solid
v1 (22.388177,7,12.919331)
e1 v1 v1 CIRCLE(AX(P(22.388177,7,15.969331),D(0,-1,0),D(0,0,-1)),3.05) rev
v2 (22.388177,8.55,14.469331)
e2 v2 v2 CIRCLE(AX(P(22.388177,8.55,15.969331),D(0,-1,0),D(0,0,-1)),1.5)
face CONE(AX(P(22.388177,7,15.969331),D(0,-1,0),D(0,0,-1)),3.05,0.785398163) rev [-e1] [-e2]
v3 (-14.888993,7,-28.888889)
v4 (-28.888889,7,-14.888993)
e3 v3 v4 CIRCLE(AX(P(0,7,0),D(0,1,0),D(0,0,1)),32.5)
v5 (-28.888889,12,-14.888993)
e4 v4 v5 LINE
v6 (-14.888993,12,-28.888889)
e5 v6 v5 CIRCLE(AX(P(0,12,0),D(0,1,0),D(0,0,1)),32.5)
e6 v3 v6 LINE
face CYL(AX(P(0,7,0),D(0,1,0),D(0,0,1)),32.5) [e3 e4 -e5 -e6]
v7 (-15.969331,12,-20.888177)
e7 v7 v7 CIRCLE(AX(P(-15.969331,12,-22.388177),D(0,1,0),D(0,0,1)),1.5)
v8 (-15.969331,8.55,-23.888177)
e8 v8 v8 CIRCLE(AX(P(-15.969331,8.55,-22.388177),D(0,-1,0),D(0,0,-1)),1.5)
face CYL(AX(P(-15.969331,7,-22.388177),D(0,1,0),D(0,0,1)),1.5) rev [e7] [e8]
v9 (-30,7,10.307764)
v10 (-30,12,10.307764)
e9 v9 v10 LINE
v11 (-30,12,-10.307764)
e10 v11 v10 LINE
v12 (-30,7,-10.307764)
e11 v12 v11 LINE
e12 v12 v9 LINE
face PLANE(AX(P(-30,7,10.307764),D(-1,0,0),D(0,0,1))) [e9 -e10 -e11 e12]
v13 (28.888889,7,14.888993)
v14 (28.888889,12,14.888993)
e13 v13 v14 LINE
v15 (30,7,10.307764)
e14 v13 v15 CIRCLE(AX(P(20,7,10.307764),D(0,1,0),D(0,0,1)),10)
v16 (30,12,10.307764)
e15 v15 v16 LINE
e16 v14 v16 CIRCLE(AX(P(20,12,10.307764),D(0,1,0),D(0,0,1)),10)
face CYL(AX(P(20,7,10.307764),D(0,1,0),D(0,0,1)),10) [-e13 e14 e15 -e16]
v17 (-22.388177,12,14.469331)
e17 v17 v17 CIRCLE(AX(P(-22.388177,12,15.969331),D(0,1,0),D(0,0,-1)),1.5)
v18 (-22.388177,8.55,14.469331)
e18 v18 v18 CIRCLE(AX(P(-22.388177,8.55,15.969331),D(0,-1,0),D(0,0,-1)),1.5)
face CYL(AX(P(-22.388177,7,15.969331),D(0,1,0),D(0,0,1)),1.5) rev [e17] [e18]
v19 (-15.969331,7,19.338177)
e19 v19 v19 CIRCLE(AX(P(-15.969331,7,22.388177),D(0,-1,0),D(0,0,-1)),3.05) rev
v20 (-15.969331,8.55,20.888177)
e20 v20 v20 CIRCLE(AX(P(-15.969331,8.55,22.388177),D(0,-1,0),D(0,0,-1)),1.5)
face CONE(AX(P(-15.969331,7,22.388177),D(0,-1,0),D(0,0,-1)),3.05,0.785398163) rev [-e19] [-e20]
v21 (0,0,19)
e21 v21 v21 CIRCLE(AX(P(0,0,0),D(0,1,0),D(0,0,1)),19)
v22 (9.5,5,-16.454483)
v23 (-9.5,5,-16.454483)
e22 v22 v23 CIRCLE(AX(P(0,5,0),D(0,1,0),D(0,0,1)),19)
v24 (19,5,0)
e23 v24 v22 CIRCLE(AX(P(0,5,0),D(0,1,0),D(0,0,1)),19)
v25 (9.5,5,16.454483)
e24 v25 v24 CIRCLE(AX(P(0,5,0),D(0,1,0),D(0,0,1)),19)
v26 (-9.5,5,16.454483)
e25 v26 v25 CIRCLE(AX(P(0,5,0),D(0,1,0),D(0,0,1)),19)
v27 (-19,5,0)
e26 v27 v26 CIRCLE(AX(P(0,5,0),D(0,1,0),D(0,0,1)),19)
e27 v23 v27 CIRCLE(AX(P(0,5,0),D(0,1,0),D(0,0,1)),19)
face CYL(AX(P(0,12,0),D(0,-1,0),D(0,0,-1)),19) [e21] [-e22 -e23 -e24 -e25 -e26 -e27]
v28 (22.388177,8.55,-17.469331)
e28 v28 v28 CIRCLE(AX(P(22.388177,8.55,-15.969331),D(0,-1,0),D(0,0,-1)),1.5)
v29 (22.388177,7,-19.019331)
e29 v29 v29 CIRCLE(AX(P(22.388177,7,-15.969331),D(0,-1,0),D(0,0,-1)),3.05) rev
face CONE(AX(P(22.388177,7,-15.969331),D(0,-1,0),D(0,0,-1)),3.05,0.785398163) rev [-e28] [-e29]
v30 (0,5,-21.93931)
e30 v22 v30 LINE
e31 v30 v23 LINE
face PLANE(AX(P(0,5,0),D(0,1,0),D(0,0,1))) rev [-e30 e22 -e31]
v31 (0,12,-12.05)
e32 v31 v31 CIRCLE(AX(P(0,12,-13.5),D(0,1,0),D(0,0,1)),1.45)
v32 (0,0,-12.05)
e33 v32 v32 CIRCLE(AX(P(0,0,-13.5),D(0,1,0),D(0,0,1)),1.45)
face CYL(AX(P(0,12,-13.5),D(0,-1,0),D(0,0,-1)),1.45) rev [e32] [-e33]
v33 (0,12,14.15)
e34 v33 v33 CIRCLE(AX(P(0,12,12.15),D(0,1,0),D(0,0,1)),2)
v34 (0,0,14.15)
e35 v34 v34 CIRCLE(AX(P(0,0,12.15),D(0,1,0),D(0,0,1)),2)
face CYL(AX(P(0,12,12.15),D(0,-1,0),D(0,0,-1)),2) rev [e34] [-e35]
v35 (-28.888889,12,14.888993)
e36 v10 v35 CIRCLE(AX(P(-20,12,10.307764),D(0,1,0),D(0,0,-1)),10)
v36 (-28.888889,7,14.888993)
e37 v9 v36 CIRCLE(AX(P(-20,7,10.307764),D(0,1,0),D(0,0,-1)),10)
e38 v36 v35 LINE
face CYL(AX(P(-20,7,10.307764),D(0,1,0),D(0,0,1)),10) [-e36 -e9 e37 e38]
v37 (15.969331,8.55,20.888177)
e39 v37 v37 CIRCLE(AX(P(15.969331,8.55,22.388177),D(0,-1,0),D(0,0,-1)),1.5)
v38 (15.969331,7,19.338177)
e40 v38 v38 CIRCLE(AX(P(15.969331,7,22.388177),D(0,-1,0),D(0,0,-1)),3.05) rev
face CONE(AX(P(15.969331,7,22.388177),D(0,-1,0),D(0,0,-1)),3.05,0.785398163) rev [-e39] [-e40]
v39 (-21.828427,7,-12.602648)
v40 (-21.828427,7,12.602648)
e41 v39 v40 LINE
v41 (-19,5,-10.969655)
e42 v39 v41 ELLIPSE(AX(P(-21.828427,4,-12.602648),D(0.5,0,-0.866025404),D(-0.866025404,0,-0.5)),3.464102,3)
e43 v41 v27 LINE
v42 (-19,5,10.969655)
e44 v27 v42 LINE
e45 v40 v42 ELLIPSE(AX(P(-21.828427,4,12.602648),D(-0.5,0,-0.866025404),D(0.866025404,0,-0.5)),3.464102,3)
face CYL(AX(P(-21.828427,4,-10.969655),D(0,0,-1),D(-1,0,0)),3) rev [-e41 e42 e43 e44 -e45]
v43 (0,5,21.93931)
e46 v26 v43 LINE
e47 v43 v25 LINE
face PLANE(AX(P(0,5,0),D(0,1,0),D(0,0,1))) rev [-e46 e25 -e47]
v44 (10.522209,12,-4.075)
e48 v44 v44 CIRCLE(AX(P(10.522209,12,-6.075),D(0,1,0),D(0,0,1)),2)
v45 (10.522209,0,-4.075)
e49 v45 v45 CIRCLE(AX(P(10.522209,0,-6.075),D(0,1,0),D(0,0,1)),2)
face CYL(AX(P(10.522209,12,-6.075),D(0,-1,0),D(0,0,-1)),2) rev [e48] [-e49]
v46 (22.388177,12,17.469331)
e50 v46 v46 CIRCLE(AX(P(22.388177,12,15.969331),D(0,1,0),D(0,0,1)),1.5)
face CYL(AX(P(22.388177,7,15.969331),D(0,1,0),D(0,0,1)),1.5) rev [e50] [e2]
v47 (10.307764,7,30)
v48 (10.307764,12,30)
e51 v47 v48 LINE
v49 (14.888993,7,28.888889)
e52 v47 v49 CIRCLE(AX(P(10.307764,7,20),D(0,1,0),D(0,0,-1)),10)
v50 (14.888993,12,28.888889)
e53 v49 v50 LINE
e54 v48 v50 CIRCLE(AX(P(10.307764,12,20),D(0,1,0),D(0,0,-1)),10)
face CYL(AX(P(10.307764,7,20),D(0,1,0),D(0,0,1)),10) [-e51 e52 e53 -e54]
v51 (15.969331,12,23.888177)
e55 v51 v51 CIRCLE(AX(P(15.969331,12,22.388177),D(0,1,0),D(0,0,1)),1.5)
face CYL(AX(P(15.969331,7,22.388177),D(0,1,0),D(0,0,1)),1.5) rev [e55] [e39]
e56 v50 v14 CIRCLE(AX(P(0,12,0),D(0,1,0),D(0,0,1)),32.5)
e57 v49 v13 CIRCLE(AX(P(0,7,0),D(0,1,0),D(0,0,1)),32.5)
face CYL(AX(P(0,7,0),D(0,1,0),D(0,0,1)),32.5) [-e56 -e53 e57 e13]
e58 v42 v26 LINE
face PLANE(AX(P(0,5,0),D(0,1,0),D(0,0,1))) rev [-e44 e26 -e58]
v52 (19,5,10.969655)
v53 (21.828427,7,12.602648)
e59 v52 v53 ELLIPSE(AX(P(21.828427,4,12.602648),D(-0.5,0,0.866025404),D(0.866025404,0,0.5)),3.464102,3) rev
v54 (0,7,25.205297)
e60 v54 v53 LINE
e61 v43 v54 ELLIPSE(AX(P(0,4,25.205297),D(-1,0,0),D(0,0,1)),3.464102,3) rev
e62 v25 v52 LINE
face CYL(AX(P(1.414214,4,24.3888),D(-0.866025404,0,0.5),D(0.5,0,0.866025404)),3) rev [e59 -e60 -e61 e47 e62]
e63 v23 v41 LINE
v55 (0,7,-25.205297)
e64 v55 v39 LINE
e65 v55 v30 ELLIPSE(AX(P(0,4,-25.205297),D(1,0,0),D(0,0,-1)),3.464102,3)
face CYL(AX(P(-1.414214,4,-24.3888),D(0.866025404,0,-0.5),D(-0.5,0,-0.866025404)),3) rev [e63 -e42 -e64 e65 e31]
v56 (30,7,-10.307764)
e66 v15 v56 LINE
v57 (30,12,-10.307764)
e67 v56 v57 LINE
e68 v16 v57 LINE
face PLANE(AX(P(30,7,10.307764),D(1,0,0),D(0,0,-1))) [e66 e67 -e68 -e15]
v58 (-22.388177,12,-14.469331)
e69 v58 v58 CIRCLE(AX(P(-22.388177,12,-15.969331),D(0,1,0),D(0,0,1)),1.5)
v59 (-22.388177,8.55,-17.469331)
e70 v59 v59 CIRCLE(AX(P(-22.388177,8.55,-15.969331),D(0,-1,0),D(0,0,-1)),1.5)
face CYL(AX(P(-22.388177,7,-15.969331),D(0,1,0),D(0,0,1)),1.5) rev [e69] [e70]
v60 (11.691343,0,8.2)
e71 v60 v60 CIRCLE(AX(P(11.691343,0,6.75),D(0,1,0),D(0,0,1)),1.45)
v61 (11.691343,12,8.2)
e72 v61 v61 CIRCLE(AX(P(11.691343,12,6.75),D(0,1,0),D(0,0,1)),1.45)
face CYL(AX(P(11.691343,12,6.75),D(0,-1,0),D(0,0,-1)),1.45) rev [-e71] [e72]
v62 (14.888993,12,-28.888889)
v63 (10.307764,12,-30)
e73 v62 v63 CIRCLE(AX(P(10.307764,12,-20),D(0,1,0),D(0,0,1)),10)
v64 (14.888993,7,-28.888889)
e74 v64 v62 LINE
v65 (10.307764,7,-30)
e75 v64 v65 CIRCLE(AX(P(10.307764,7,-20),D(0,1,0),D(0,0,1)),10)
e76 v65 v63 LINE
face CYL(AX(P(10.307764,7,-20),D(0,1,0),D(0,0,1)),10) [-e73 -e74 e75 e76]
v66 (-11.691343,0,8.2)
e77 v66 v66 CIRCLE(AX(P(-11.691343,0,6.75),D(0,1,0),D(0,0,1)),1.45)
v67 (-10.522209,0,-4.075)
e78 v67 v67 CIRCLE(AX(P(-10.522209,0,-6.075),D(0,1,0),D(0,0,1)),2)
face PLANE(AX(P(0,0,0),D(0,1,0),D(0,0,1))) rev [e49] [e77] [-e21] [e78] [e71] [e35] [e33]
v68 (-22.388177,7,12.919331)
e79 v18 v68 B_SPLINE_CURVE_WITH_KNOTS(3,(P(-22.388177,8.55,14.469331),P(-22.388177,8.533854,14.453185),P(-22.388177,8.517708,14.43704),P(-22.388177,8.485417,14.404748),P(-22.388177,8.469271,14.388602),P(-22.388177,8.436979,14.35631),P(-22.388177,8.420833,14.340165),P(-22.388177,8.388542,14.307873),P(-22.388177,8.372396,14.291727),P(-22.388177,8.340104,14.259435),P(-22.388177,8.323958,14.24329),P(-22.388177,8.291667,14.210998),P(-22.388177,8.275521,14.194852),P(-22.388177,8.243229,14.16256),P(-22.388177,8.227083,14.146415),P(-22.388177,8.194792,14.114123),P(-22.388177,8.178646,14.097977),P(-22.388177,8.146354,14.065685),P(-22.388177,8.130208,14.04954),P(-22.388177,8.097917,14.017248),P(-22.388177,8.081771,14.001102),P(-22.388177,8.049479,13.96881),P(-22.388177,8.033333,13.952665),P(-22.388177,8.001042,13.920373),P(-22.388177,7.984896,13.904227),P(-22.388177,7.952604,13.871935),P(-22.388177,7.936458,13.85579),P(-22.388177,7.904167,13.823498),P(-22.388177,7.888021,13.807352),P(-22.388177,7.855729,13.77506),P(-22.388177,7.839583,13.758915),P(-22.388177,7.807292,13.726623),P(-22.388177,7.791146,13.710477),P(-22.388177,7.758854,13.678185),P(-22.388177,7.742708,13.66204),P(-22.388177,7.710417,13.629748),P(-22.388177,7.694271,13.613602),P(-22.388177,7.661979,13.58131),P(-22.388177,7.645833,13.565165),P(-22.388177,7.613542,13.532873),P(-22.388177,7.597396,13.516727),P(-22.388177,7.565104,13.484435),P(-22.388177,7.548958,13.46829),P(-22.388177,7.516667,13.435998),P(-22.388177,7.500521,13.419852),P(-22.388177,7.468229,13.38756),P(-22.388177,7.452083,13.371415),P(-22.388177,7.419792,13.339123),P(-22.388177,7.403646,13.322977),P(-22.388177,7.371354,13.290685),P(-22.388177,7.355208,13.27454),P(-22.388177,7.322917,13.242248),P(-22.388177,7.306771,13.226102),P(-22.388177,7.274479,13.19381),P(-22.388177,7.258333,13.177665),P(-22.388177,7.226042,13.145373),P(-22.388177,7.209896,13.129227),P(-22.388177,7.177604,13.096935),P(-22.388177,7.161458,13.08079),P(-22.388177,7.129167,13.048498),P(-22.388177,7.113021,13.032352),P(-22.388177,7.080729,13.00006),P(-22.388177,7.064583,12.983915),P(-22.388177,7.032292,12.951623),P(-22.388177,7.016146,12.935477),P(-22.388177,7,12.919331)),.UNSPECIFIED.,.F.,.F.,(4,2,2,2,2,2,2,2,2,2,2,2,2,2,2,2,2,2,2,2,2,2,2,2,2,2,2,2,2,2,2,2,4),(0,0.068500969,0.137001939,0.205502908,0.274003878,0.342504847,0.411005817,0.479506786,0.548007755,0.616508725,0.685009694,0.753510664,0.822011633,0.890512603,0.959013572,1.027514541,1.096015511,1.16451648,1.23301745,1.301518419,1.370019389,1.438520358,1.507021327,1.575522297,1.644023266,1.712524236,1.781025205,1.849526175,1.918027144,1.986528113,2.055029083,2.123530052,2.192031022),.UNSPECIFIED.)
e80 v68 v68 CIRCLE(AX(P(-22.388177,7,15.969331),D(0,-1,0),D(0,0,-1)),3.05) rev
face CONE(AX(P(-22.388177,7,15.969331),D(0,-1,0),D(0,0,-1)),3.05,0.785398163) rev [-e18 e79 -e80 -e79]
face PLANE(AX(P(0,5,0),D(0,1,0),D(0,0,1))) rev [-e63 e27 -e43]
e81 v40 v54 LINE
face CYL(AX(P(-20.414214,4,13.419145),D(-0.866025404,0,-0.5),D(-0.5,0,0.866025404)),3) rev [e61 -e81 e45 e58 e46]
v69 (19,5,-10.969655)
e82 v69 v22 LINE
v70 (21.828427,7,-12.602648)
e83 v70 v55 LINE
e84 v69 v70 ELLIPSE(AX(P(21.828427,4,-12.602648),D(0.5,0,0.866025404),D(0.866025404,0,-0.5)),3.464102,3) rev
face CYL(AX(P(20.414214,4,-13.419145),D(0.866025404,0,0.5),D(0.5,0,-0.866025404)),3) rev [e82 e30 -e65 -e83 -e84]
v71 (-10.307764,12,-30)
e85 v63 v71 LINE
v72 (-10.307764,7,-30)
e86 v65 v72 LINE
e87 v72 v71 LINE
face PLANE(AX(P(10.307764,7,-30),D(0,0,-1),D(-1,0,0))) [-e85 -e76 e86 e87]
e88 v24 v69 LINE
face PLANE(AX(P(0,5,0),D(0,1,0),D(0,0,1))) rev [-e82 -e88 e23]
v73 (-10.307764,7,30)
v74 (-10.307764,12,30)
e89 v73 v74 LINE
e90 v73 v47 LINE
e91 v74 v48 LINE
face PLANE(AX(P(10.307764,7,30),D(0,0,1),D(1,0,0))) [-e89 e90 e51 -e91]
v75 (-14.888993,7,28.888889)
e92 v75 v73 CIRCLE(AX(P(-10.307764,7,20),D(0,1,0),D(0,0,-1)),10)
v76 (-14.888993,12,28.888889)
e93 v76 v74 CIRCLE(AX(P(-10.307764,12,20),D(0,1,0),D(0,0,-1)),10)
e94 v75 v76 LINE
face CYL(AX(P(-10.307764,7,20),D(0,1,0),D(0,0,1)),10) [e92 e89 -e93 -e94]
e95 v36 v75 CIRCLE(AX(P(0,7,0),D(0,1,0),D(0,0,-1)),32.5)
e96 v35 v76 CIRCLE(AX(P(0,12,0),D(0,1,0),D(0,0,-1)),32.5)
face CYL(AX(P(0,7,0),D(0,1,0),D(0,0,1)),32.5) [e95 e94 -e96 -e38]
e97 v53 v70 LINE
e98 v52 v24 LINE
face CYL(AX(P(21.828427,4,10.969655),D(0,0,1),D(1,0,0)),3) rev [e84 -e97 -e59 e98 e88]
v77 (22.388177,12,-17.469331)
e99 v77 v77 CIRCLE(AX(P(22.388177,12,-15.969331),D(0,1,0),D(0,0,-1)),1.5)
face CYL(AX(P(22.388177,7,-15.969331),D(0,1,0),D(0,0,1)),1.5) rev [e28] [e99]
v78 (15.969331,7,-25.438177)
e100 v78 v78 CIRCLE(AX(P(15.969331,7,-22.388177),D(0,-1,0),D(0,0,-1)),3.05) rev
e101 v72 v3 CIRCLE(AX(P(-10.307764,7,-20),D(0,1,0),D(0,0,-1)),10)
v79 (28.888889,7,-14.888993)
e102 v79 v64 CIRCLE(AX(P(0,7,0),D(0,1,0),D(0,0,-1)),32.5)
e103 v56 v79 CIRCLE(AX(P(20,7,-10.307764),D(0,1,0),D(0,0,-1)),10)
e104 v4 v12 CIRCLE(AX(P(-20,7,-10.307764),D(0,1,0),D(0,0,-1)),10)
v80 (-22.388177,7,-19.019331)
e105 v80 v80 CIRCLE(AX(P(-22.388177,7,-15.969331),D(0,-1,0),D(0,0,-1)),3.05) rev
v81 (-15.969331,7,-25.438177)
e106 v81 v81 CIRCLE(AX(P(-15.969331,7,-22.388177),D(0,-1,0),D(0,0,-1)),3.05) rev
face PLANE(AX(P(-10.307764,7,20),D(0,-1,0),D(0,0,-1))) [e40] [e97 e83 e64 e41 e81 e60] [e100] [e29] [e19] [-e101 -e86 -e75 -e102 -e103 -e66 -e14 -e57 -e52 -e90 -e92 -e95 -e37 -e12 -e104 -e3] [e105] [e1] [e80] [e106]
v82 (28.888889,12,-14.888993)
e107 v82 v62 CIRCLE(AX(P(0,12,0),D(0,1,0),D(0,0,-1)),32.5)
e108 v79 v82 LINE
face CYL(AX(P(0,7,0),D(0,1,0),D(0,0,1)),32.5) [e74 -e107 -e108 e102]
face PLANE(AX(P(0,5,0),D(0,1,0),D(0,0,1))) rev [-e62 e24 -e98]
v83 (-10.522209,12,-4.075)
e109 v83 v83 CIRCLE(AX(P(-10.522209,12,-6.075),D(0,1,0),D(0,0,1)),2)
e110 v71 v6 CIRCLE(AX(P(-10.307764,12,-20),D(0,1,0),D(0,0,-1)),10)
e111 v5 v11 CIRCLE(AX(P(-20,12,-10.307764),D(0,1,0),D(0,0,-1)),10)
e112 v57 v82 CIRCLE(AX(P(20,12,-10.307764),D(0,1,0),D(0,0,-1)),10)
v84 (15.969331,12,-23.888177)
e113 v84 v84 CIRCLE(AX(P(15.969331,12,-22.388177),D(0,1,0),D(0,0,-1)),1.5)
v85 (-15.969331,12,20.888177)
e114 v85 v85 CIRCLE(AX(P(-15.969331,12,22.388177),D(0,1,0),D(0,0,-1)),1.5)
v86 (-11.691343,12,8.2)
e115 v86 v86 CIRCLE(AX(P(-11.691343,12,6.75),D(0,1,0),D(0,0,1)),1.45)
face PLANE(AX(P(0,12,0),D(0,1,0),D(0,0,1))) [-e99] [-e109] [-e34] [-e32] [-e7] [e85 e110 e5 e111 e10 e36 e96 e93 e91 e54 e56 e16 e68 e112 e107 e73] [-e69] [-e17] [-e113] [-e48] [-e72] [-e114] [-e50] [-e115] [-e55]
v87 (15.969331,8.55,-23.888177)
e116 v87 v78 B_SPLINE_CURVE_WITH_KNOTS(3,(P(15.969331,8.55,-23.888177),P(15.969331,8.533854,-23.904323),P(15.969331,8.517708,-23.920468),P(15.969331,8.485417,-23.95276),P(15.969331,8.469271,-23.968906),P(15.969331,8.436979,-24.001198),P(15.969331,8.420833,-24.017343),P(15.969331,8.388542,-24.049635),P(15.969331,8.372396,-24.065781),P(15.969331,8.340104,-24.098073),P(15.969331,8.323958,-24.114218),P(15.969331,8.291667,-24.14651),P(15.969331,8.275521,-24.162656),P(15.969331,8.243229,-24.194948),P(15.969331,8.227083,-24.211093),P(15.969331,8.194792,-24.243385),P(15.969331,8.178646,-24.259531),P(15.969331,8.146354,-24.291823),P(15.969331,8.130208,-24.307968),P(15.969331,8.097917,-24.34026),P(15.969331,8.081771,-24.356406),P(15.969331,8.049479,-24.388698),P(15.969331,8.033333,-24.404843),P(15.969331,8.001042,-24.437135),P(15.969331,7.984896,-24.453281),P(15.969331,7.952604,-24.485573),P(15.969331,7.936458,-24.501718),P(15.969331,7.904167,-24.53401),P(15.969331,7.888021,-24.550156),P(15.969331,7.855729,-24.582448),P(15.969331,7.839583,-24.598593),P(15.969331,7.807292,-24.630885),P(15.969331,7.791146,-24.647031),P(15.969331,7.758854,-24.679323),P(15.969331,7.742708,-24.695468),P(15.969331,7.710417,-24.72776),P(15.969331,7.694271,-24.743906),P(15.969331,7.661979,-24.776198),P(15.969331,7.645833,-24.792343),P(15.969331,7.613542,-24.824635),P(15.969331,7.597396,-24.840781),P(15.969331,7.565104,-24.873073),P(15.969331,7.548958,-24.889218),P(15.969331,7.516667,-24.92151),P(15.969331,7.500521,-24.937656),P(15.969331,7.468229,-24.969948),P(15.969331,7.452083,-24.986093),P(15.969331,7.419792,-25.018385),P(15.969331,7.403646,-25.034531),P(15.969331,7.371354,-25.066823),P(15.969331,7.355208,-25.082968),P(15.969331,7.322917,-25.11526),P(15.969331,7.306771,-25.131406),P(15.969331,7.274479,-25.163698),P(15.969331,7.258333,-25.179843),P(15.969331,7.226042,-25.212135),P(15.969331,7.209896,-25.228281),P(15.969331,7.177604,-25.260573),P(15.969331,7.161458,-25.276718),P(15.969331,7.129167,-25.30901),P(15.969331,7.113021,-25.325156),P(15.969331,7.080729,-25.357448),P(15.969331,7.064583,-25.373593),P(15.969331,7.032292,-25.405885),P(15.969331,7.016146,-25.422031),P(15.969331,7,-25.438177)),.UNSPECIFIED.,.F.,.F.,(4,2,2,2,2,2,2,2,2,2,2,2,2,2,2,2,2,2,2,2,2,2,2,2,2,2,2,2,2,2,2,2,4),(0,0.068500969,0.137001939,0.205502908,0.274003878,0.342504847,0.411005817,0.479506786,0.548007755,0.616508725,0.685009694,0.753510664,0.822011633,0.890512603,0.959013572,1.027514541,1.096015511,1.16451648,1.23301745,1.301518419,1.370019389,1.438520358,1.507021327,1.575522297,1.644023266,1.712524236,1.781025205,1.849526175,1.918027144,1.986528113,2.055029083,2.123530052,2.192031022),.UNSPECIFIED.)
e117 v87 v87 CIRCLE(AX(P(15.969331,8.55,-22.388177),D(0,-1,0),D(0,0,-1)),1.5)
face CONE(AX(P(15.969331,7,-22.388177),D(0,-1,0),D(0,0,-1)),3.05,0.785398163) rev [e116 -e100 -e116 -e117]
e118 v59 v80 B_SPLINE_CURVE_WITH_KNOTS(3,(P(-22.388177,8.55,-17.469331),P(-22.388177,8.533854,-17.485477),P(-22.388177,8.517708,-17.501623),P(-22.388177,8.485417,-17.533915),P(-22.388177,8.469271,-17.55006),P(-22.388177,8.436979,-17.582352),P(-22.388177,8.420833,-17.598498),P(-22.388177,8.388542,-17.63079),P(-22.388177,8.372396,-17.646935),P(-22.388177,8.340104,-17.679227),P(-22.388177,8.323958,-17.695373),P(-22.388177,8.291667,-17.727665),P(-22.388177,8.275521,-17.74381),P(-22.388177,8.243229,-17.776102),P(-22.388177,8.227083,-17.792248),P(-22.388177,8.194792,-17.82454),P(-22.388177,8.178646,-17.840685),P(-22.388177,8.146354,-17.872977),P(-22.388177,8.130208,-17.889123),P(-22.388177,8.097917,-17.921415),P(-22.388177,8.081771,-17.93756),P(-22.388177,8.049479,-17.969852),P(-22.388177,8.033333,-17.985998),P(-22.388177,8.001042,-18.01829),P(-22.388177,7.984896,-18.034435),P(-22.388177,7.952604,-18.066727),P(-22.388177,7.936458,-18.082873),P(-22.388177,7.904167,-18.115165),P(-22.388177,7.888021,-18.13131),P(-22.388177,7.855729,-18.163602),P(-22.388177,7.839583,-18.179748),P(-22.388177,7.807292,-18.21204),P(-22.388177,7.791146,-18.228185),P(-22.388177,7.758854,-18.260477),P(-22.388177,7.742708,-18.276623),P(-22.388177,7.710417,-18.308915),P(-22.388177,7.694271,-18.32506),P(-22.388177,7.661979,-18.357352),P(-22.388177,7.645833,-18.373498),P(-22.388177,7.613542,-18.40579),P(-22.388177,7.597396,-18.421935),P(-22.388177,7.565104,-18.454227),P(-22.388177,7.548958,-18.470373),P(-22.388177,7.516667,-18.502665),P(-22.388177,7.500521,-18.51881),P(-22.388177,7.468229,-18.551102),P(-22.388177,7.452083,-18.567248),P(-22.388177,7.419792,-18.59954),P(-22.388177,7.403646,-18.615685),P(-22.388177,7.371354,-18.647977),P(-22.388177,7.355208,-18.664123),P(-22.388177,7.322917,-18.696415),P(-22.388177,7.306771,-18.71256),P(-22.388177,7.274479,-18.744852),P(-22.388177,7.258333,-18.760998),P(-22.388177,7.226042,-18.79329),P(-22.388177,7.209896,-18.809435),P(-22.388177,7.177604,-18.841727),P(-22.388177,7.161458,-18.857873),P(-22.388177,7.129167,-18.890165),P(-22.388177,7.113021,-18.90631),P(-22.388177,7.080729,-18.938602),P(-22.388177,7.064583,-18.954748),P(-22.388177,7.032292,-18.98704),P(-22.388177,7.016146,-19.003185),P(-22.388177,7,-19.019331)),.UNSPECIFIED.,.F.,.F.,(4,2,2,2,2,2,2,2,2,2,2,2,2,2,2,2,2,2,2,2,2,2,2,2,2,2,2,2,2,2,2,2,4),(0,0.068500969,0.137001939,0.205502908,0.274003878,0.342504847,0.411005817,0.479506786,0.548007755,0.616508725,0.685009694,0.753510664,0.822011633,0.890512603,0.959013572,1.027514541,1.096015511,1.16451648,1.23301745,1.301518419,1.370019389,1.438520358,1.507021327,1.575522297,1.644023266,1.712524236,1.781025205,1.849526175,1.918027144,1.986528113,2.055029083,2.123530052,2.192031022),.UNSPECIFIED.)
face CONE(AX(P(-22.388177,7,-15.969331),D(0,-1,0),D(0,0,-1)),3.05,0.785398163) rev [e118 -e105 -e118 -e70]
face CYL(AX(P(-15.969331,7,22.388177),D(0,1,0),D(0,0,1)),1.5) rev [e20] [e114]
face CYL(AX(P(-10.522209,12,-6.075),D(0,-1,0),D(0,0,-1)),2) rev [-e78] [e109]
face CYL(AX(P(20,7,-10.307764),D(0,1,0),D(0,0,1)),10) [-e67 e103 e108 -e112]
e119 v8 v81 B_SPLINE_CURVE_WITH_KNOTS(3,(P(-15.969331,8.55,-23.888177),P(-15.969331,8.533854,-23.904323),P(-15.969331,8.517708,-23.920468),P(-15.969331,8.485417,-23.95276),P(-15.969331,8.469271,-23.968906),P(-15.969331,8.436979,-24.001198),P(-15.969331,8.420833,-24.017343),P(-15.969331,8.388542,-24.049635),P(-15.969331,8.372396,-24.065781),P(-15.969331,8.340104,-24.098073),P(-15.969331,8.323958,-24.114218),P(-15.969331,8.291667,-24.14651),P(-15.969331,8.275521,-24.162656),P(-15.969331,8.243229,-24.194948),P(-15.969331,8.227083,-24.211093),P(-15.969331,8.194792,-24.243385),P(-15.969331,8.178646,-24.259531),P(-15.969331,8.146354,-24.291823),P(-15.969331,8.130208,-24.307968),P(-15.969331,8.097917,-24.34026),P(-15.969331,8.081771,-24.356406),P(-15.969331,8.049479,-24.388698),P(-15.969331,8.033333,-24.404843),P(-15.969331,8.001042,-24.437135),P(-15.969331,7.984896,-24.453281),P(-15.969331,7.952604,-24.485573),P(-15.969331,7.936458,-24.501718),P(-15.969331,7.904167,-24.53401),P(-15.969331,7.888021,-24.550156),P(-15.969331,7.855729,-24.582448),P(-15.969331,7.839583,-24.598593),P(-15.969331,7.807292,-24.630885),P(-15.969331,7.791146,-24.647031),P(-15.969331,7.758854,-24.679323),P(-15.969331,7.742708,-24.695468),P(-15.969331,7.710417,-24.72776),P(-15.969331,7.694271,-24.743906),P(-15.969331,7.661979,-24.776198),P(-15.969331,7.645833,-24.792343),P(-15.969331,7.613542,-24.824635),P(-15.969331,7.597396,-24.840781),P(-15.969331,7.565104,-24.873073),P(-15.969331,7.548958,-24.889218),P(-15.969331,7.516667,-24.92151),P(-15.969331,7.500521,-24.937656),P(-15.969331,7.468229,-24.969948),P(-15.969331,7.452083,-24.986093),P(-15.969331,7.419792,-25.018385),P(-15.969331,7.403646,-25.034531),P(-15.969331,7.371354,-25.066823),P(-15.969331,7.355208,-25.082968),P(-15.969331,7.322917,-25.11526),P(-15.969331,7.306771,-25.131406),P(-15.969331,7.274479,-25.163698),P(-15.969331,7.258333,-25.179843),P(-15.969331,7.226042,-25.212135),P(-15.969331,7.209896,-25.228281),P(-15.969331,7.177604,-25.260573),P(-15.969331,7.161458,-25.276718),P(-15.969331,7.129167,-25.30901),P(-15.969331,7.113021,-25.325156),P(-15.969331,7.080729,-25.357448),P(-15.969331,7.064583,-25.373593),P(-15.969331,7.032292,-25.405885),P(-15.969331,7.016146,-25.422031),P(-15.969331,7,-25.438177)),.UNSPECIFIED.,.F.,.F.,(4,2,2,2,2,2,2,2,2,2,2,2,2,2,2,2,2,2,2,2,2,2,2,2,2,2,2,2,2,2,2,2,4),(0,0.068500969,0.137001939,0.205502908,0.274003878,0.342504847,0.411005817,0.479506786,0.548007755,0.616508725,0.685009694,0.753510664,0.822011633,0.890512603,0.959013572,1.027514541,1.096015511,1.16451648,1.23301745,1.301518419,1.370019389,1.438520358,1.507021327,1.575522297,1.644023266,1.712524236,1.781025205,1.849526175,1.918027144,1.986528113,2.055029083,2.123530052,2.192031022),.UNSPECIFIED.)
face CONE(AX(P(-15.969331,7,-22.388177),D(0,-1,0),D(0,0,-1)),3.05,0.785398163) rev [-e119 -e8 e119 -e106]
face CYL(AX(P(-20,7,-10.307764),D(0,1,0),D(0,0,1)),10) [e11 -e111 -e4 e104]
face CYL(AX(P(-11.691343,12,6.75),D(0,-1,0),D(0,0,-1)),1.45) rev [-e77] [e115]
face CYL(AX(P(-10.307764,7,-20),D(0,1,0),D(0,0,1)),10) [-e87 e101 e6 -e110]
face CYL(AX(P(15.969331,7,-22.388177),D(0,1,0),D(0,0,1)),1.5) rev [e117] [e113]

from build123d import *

# Parameters (mm, degrees)
SKETCH_1_R          = 19
SKETCH_1_R_2        = 1.45
SKETCH_1_R_3        = 2
EXTRUDE_1_DEPTH     = 12
EXTRUDE_START       = -7
SKETCH_2_R          = 1.45
SKETCH_2_R_2        = 2
EXTRUDE_2_DEPTH     = 7
SKETCH_3_R          = 1.45
CUT_EXTRUDE_1_DEPTH = 8
SKETCH_4_R          = 1.45
CUT_EXTRUDE_2_DEPTH = 8
SKETCH_5_R          = 1.45
CUT_EXTRUDE_3_DEPTH = 8
CUT_EXTRUDE_START   = -8
SKETCH_6_R          = 1.45
CUT_EXTRUDE_4_DEPTH = 8
SKETCH_7_R          = 1.45
CUT_EXTRUDE_5_DEPTH = 8
EXTRUDE_START_2     = -5
SKETCH_8_R          = 1.5
SKETCH_8_R_2        = 2
EXTRUDE_3_DEPTH     = 5
FILLET_1_R          = 3
CHAMFER_1_SIZE      = 1.55


with BuildPart() as part:
    # 草图1 → 凸台-拉伸1 (new body)
    with BuildSketch(Plane(origin=(0, 0, 0), x_dir=(1, 0, 0), z_dir=(0, 1, 0))):
        with Locations(Location((0, 0, 0), (0, 0, 270))):
            Circle(SKETCH_1_R)
        with Locations(Location((0, 13.5, 0), (0, 0, 270))):
            Circle(SKETCH_1_R_2, mode=Mode.SUBTRACT)
        with Locations(Location((-11.691342951, -6.75, 0), (0, 0, 270))):
            Circle(SKETCH_1_R_2, mode=Mode.SUBTRACT)
        with Locations(Location((11.691342951, -6.75, 0), (0, 0, 270))):
            Circle(SKETCH_1_R_2, mode=Mode.SUBTRACT)
        with Locations(Location((-10.522208656, 6.075, 0), (0, 0, 270))):
            Circle(SKETCH_1_R_3, mode=Mode.SUBTRACT)
        with Locations(Location((0, -12.15, 0), (0, 0, 270))):
            Circle(SKETCH_1_R_3, mode=Mode.SUBTRACT)
        with Locations(Location((10.522208656, 6.075, 0), (0, 0, 270))):
            Circle(SKETCH_1_R_3, mode=Mode.SUBTRACT)
    extrude(amount=EXTRUDE_1_DEPTH)

    # 草图2 → 凸台-拉伸2 (add)
    with BuildSketch(Plane(origin=(0, 12, 0), x_dir=(1, 0, 0), z_dir=(0, 1, 0)).offset(EXTRUDE_START)):
        Polygon((0, 21.939310229), (-19, 10.969655115), (-19, -10.969655115), (0, -21.939310229), (19, -10.969655115), (19, 10.969655115), align=None)
        with Locations(Location((0, 13.5, 0), (0, 0, 270))):
            Circle(SKETCH_2_R, mode=Mode.SUBTRACT)
        with Locations(Location((-10.522208656, 6.075, 0), (0, 0, 270))):
            Circle(SKETCH_2_R_2, mode=Mode.SUBTRACT)
        with Locations(Location((10.522208656, 6.075, 0), (0, 0, 270))):
            Circle(SKETCH_2_R_2, mode=Mode.SUBTRACT)
        with Locations(Location((-11.691342951, -6.75, 0), (0, 0, 270))):
            Circle(SKETCH_2_R, mode=Mode.SUBTRACT)
        with Locations(Location((0, -12.15, 0), (0, 0, 270))):
            Circle(SKETCH_2_R_2, mode=Mode.SUBTRACT)
        with Locations(Location((11.691342951, -6.75, 0), (0, 0, 270))):
            Circle(SKETCH_2_R, mode=Mode.SUBTRACT)
    extrude(amount=EXTRUDE_2_DEPTH)

    # 草图3 → 切除-拉伸1 (cut)
    with BuildSketch(Plane(origin=(9.5, 0, 16.454482672), x_dir=(0.8660254037844384, 0, -0.5000000000000004), z_dir=(0.5000000000000004, 0, 0.8660254037844384))):
        with Locations((0, 8.5)):
            Circle(SKETCH_3_R)
    extrude(amount=-CUT_EXTRUDE_1_DEPTH, mode=Mode.SUBTRACT)

    # 草图4 → 切除-拉伸2 (cut)
    with BuildSketch(Plane(origin=(-9.5, 0, 16.454482672), x_dir=(0.8660254037844385, 0, 0.5000000000000004), z_dir=(-0.5000000000000003, 0, 0.8660254037844384))):
        with Locations((0, 8.5)):
            Circle(SKETCH_4_R)
    extrude(amount=-CUT_EXTRUDE_2_DEPTH, mode=Mode.SUBTRACT)

    # 草图5 → 切除-拉伸3 (cut)
    with BuildSketch(Plane.ZY.offset(19)):
        with Locations((0, 8.5)):
            Circle(SKETCH_5_R)
    extrude(amount=-CUT_EXTRUDE_3_DEPTH, mode=Mode.SUBTRACT)

    # 草图6 → 切除-拉伸4 (cut)
    with BuildSketch(Plane(origin=(19, 0, 0), x_dir=(0, 0, -1), z_dir=(1, 0, 0)).offset(CUT_EXTRUDE_START)):
        with Locations(Location((0, 8.5, 0), (0, 0, 180))):
            Circle(SKETCH_6_R)
    extrude(amount=CUT_EXTRUDE_4_DEPTH, mode=Mode.SUBTRACT)

    # 草图7 → 切除-拉伸5 (cut)
    with BuildSketch(Plane(origin=(9.5, 0, -16.454482672), x_dir=(-0.8660254037844387, 0, -0.49999999999999994), z_dir=(0.4999999999999999, 0, -0.8660254037844386)).offset(CUT_EXTRUDE_START)):
        with Locations(Location((0, 8.5, 0), (0, 0, 180))):
            Circle(SKETCH_7_R)
    extrude(amount=CUT_EXTRUDE_5_DEPTH, mode=Mode.SUBTRACT)

    # 草图8 → 凸台-拉伸3 (add)
    with BuildSketch(Plane(origin=(0, 12, 0), x_dir=(1, 0, 0), z_dir=(0, 1, 0)).offset(EXTRUDE_START_2)):
        with BuildLine():
            Line((10.307764064, 30), (-10.307764064, 30))
            ThreePointArc((-10.307764064, 30), (-12.664786668, 29.718253158), (-14.888992537, 28.888888889))
            ThreePointArc((-14.888992537, 28.888888889), (-22.980970389, 22.980970389), (-28.888888889, 14.888992537))
            ThreePointArc((-28.888888889, 14.888992537), (-29.718253158, 12.664786668), (-30, 10.307764064))
            Line((-30, 10.307764064), (-30, -10.307764064))
            ThreePointArc((-30, -10.307764064), (-29.718253158, -12.664786668), (-28.888888889, -14.888992537))
            ThreePointArc((-28.888888889, -14.888992537), (-22.980970389, -22.980970389), (-14.888992537, -28.888888889))
            ThreePointArc((-14.888992537, -28.888888889), (-12.664786668, -29.718253158), (-10.307764064, -30))
            Line((-10.307764064, -30), (10.307764064, -30))
            ThreePointArc((10.307764064, -30), (12.664786668, -29.718253158), (14.888992537, -28.888888889))
            ThreePointArc((14.888992537, -28.888888889), (22.980970389, -22.980970389), (28.888888889, -14.888992537))
            ThreePointArc((28.888888889, -14.888992537), (29.718253158, -12.664786668), (30, -10.307764064))
            Line((30, -10.307764064), (30, 10.307764064))
            ThreePointArc((30, 10.307764064), (29.718253158, 12.664786668), (28.888888889, 14.888992537))
            ThreePointArc((28.888888889, 14.888992537), (22.980970389, 22.980970389), (14.888992537, 28.888888889))
            ThreePointArc((14.888992537, 28.888888889), (12.664786668, 29.718253158), (10.307764064, 30))
        make_face()
        with Locations(Location((-22.388176755, 15.969331282, 0), (0, 0, 270))):
            Circle(SKETCH_8_R, mode=Mode.SUBTRACT)
        with Locations(Location((-15.969331282, 22.388176755, 0), (0, 0, 270))):
            Circle(SKETCH_8_R, mode=Mode.SUBTRACT)
        with Locations(Location((-22.388176755, -15.969331282, 0), (0, 0, 90))):
            Circle(SKETCH_8_R, mode=Mode.SUBTRACT)
        with Locations(Location((-15.969331282, -22.388176755, 0), (0, 0, 90))):
            Circle(SKETCH_8_R, mode=Mode.SUBTRACT)
        with Locations(Location((15.969331282, -22.388176755, 0), (0, 0, 270))):
            Circle(SKETCH_8_R, mode=Mode.SUBTRACT)
        with Locations(Location((22.388176755, -15.969331282, 0), (0, 0, 270))):
            Circle(SKETCH_8_R, mode=Mode.SUBTRACT)
        with Locations(Location((22.388176755, 15.969331282, 0), (0, 0, 90))):
            Circle(SKETCH_8_R, mode=Mode.SUBTRACT)
        with Locations(Location((15.969331282, 22.388176755, 0), (0, 0, 90))):
            Circle(SKETCH_8_R, mode=Mode.SUBTRACT)
        with Locations((0, 13.5)):
            Circle(SKETCH_8_R, mode=Mode.SUBTRACT)
        with Locations((11.691342951, -6.75)):
            Circle(SKETCH_8_R, mode=Mode.SUBTRACT)
        with Locations(Location((0, -12.15, 0), (0, 0, 270))):
            Circle(SKETCH_8_R_2, mode=Mode.SUBTRACT)
        with Locations(Location((10.522208656, 6.075, 0), (0, 0, 270))):
            Circle(SKETCH_8_R_2, mode=Mode.SUBTRACT)
        with Locations((-11.691342951, -6.75)):
            Circle(SKETCH_8_R, mode=Mode.SUBTRACT)
        with Locations(Location((-10.522208656, 6.075, 0), (0, 0, 270))):
            Circle(SKETCH_8_R_2, mode=Mode.SUBTRACT)
    extrude(amount=EXTRUDE_3_DEPTH)

    # 圆角1
    # the kernel refuses this fillet: 3 mm, written as the material it adds along each edge
    with BuildSketch(Plane(origin=(-25.123724357, 7, 7.434121209), x_dir=(0, -1, 0), z_dir=(0.8660254037844385, 0, 0.5000000000000003))) as fillet_1_piece_1_section:
        with BuildLine():
            CenterArc((3, -2.828427125), FILLET_1_R, 109.471220634, 70.528779366)
            Line((0, -2.828427125), (-0.06, -2.828427125))
            Line((-0.06, -2.828427125), (-0.06, 0))
            Line((-0.06, 0), (0, 0.06))
            ThreePointArc((0, 0.06), (1, 0.06), (1.98, 0.056568542))
            Line((1.98, 0.056568542), (2, 0))
        make_face()
    fillet_1_piece_1 = extrude(amount=36.081445853, mode=Mode.PRIVATE)
    fillet_1_piece_1 = split(fillet_1_piece_1, bisect_by=Plane(origin=(-5.242974287, 6.477045854, 24.966342845), z_dir=(-0.5000000000000004, 0, -0.8660254037844384)), keep=Keep.TOP, mode=Mode.PRIVATE)
    fillet_1_piece_1 = split(fillet_1_piece_1, bisect_by=Plane(origin=(-19, 6.477045854, 17.023720346), z_dir=(1, 0, 0)), keep=Keep.TOP, mode=Mode.PRIVATE)
    add(fillet_1_piece_1)
    with BuildSketch(Plane(origin=(-6.123724357, 7, 25.474844135), x_dir=(0, -1, 0), z_dir=(0.8660254037844384, 0, -0.5000000000000004))) as fillet_1_piece_2_section:
        with BuildLine():
            CenterArc((3, -2.828427125), FILLET_1_R, 109.471220634, 70.528779366)
            Line((0, -2.828427125), (-0.06, -2.828427125))
            Line((-0.06, -2.828427125), (-0.06, 0))
            Line((-0.06, 0), (0, 0.06))
            ThreePointArc((0, 0.06), (1, 0.06), (1.98, 0.056568542))
            Line((1.98, 0.056568542), (2, 0))
        make_face()
    fillet_1_piece_2 = extrude(amount=36.081445853, mode=Mode.PRIVATE)
    fillet_1_piece_2 = split(fillet_1_piece_2, bisect_by=Plane(origin=(19, 6.477045854, 17.023720346), z_dir=(-1, 0, 0)), keep=Keep.TOP, mode=Mode.PRIVATE)
    fillet_1_piece_2 = split(fillet_1_piece_2, bisect_by=Plane(origin=(5.242974287, 6.477045854, 24.966342845), z_dir=(0.5000000000000003, 0, -0.8660254037844385)), keep=Keep.TOP, mode=Mode.PRIVATE)
    add(fillet_1_piece_2)
    with BuildSketch(Plane(origin=(19, 7, 18.040722926), x_dir=(1, 0, 0), z_dir=(0, 0, -1))) as fillet_1_piece_3_section:
        with BuildLine():
            CenterArc((2.828427125, 3), FILLET_1_R, 199.471220634, 70.528779366)
            Line((0, 2), (-0.056568542, 1.98))
            ThreePointArc((-0.056568542, 1.98), (-0.06, 1), (-0.06, 0))
            Line((-0.06, 0), (0, -0.06))
            Line((0, -0.06), (2.828427125, -0.06))
            Line((2.828427125, -0.06), (2.828427125, 0))
        make_face()
    fillet_1_piece_3 = extrude(amount=36.081445853, mode=Mode.PRIVATE)
    fillet_1_piece_3 = split(fillet_1_piece_3, bisect_by=Plane(origin=(24.242974287, 6.477045854, 7.942622499), z_dir=(-0.5000000000000004, 0, -0.8660254037844384)), keep=Keep.TOP, mode=Mode.PRIVATE)
    fillet_1_piece_3 = split(fillet_1_piece_3, bisect_by=Plane(origin=(24.242974287, 6.477045854, -7.942622499), z_dir=(-0.49999999999999983, 0, 0.8660254037844388)), keep=Keep.TOP, mode=Mode.PRIVATE)
    add(fillet_1_piece_3)
    with BuildSketch(Plane(origin=(25.123724357, 7, -7.434121209), x_dir=(0, -1, 0), z_dir=(-0.8660254037844388, 0, -0.49999999999999983))) as fillet_1_piece_4_section:
        with BuildLine():
            CenterArc((3, -2.828427125), FILLET_1_R, 109.471220634, 70.528779366)
            Line((0, -2.828427125), (-0.06, -2.828427125))
            Line((-0.06, -2.828427125), (-0.06, 0))
            Line((-0.06, 0), (0, 0.06))
            ThreePointArc((0, 0.06), (1, 0.06), (1.98, 0.056568542))
            Line((1.98, 0.056568542), (2, 0))
        make_face()
    fillet_1_piece_4 = extrude(amount=36.081445853, mode=Mode.PRIVATE)
    fillet_1_piece_4 = split(fillet_1_piece_4, bisect_by=Plane(origin=(5.242974287, 6.477045854, -24.966342845), z_dir=(0.5000000000000001, 0, 0.8660254037844386)), keep=Keep.TOP, mode=Mode.PRIVATE)
    fillet_1_piece_4 = split(fillet_1_piece_4, bisect_by=Plane(origin=(19, 6.477045854, -17.023720346), z_dir=(-1, 0, 0)), keep=Keep.TOP, mode=Mode.PRIVATE)
    add(fillet_1_piece_4)
    with BuildSketch(Plane(origin=(6.123724357, 7, -25.474844135), x_dir=(0, -1, 0), z_dir=(-0.8660254037844386, 0, 0.5000000000000001))) as fillet_1_piece_5_section:
        with BuildLine():
            CenterArc((3, -2.828427125), FILLET_1_R, 109.471220634, 70.528779366)
            Line((0, -2.828427125), (-0.06, -2.828427125))
            Line((-0.06, -2.828427125), (-0.06, 0))
            Line((-0.06, 0), (0, 0.06))
            ThreePointArc((0, 0.06), (1, 0.06), (1.98, 0.056568542))
            Line((1.98, 0.056568542), (2, 0))
        make_face()
    fillet_1_piece_5 = extrude(amount=36.081445853, mode=Mode.PRIVATE)
    fillet_1_piece_5 = split(fillet_1_piece_5, bisect_by=Plane(origin=(-19, 6.477045854, -17.023720346), z_dir=(1, 0, 0)), keep=Keep.TOP, mode=Mode.PRIVATE)
    fillet_1_piece_5 = split(fillet_1_piece_5, bisect_by=Plane(origin=(-5.242974287, 6.477045854, -24.966342845), z_dir=(-0.49999999999999983, 0, 0.8660254037844388)), keep=Keep.TOP, mode=Mode.PRIVATE)
    add(fillet_1_piece_5)
    with BuildSketch(Plane(origin=(-19, 7, -18.040722926), x_dir=(0, -1, 0), z_dir=(0, 0, 1))) as fillet_1_piece_6_section:
        with BuildLine():
            CenterArc((3, -2.828427125), FILLET_1_R, 109.471220634, 70.528779366)
            Line((0, -2.828427125), (-0.06, -2.828427125))
            Line((-0.06, -2.828427125), (-0.06, 0))
            Line((-0.06, 0), (0, 0.06))
            ThreePointArc((0, 0.06), (1, 0.06), (1.98, 0.056568542))
            Line((1.98, 0.056568542), (2, 0))
        make_face()
    fillet_1_piece_6 = extrude(amount=36.081445853, mode=Mode.PRIVATE)
    fillet_1_piece_6 = split(fillet_1_piece_6, bisect_by=Plane(origin=(-24.242974287, 6.477045854, 7.942622499), z_dir=(0.5000000000000003, 0, -0.8660254037844385)), keep=Keep.TOP, mode=Mode.PRIVATE)
    fillet_1_piece_6 = split(fillet_1_piece_6, bisect_by=Plane(origin=(-24.242974287, 6.477045854, -7.942622499), z_dir=(0.5000000000000001, 0, 0.8660254037844386)), keep=Keep.TOP, mode=Mode.PRIVATE)
    add(fillet_1_piece_6)
    with BuildSketch(Plane(origin=(-25.123724357, 7, 7.434121209), x_dir=(0, -1, 0), z_dir=(0.8660254037844385, 0, 0.5000000000000003))) as fillet_1_piece_7a_section:
        with BuildLine():
            CenterArc((3, -2.828427125), FILLET_1_R, 109.471220634, 70.528779366)
            Line((0, -2.828427125), (-0.06, -2.828427125))
            Line((-0.06, -2.828427125), (-0.06, 0))
            Line((-0.06, 0), (0, 0.06))
            ThreePointArc((0, 0.06), (1, 0.06), (1.98, 0.056568542))
            Line((1.98, 0.056568542), (2, 0))
        make_face()
    fillet_1_piece_7a = extrude(amount=36.081445853, mode=Mode.PRIVATE)
    fillet_1_piece_7a = split(fillet_1_piece_7a, bisect_by=Plane(origin=(-19, 6.499823967, 9.91733875), z_dir=(-1, 0, 0)), keep=Keep.TOP, mode=Mode.PRIVATE)
    with BuildSketch(Plane(origin=(-19, 7, -18.040722926), x_dir=(0, -1, 0), z_dir=(0, 0, 1))) as fillet_1_piece_7b_section:
        with BuildLine():
            CenterArc((3, -2.828427125), FILLET_1_R, 109.471220634, 70.528779366)
            Line((0, -2.828427125), (-0.06, -2.828427125))
            Line((-0.06, -2.828427125), (-0.06, 0))
            Line((-0.06, 0), (0, 0.06))
            ThreePointArc((0, 0.06), (1, 0.06), (1.98, 0.056568542))
            Line((1.98, 0.056568542), (2, 0))
        make_face()
    fillet_1_piece_7b = extrude(amount=36.081445853, mode=Mode.PRIVATE)
    fillet_1_piece_7b = split(fillet_1_piece_7b, bisect_by=Plane(origin=(-18.0817985, 6.492985076, 11.499778998), z_dir=(-0.5000000000000003, 0, 0.8660254037844385)), keep=Keep.TOP, mode=Mode.PRIVATE)
    fillet_1_piece_7b = fillet_1_piece_7b - Plane(origin=(-22.388176755, 6.492985076, 15.969331282), x_dir=(0, 0, -1), z_dir=(0, -1, 0)) * Cylinder(1.5, 84, mode=Mode.PRIVATE)
    fillet_1_piece_7 = fillet_1_piece_7a & fillet_1_piece_7b
    add(fillet_1_piece_7)
    with BuildSketch(Plane(origin=(-6.123724357, 7, 25.474844135), x_dir=(0, -1, 0), z_dir=(0.8660254037844384, 0, -0.5000000000000004))) as fillet_1_piece_8a_section:
        with BuildLine():
            CenterArc((3, -2.828427125), FILLET_1_R, 109.471220634, 70.528779366)
            Line((0, -2.828427125), (-0.06, -2.828427125))
            Line((-0.06, -2.828427125), (-0.06, 0))
            Line((-0.06, 0), (0, 0.06))
            ThreePointArc((0, 0.06), (1, 0.06), (1.98, 0.056568542))
            Line((1.98, 0.056568542), (2, 0))
        make_face()
    fillet_1_piece_8a = extrude(amount=36.081445853, mode=Mode.PRIVATE)
    fillet_1_piece_8a = split(fillet_1_piece_8a, bisect_by=Plane(origin=(-0.911332705, 6.499823967, 21.413152047), z_dir=(-0.5000000000000003, 0, 0.8660254037844385)), keep=Keep.TOP, mode=Mode.PRIVATE)
    with BuildSketch(Plane(origin=(-25.123724357, 7, 7.434121209), x_dir=(0, -1, 0), z_dir=(0.8660254037844385, 0, 0.5000000000000003))) as fillet_1_piece_8b_section:
        with BuildLine():
            CenterArc((3, -2.828427125), FILLET_1_R, 109.471220634, 70.528779366)
            Line((0, -2.828427125), (-0.06, -2.828427125))
            Line((-0.06, -2.828427125), (-0.06, 0))
            Line((-0.06, 0), (0, 0.06))
            ThreePointArc((0, 0.06), (1, 0.06), (1.98, 0.056568542))
            Line((1.98, 0.056568542), (2, 0))
        make_face()
    fillet_1_piece_8b = extrude(amount=36.081445853, mode=Mode.PRIVATE)
    fillet_1_piece_8b = split(fillet_1_piece_8b, bisect_by=Plane(origin=(0.911332705, 6.499823967, 21.413152047), z_dir=(0.5000000000000004, 0, 0.8660254037844384)), keep=Keep.TOP, mode=Mode.PRIVATE)
    fillet_1_piece_8 = fillet_1_piece_8a & fillet_1_piece_8b
    add(fillet_1_piece_8)
    with BuildSketch(Plane(origin=(-6.123724357, 7, 25.474844135), x_dir=(0, -1, 0), z_dir=(0.8660254037844384, 0, -0.5000000000000004))) as fillet_1_piece_9a_section:
        with BuildLine():
            CenterArc((3, -2.828427125), FILLET_1_R, 109.471220634, 70.528779366)
            Line((0, -2.828427125), (-0.06, -2.828427125))
            Line((-0.06, -2.828427125), (-0.06, 0))
            Line((-0.06, 0), (0, 0.06))
            ThreePointArc((0, 0.06), (1, 0.06), (1.98, 0.056568542))
            Line((1.98, 0.056568542), (2, 0))
        make_face()
    fillet_1_piece_9a = extrude(amount=36.081445853, mode=Mode.PRIVATE)
    fillet_1_piece_9a = split(fillet_1_piece_9a, bisect_by=Plane(origin=(19, 6.499823967, 9.91733875), z_dir=(1, 0, 0)), keep=Keep.TOP, mode=Mode.PRIVATE)
    with BuildSketch(Plane(origin=(19, 7, 18.040722926), x_dir=(1, 0, 0), z_dir=(0, 0, -1))) as fillet_1_piece_9b_section:
        with BuildLine():
            CenterArc((2.828427125, 3), FILLET_1_R, 199.471220634, 70.528779366)
            Line((0, 2), (-0.056568542, 1.98))
            ThreePointArc((-0.056568542, 1.98), (-0.06, 1), (-0.06, 0))
            Line((-0.06, 0), (0, -0.06))
            Line((0, -0.06), (2.828427125, -0.06))
            Line((2.828427125, -0.06), (2.828427125, 0))
        make_face()
    fillet_1_piece_9b = extrude(amount=36.081445853, mode=Mode.PRIVATE)
    fillet_1_piece_9b = split(fillet_1_piece_9b, bisect_by=Plane(origin=(18.081798409, 6.49298497, 11.49977905), z_dir=(0.5000000000000004, 0, 0.8660254037844384)), keep=Keep.TOP, mode=Mode.PRIVATE)
    fillet_1_piece_9b = fillet_1_piece_9b - Plane(origin=(22.388176755, 6.49298497, 15.969331282), x_dir=(0, 0, 1), z_dir=(0, -1, 0)) * Cylinder(1.5, 84, mode=Mode.PRIVATE)
    fillet_1_piece_9 = fillet_1_piece_9a & fillet_1_piece_9b
    add(fillet_1_piece_9)
    with BuildSketch(Plane(origin=(25.123724357, 7, -7.434121209), x_dir=(0, -1, 0), z_dir=(-0.8660254037844388, 0, -0.49999999999999983))) as fillet_1_piece_10a_section:
        with BuildLine():
            CenterArc((3, -2.828427125), FILLET_1_R, 109.471220634, 70.528779366)
            Line((0, -2.828427125), (-0.06, -2.828427125))
            Line((-0.06, -2.828427125), (-0.06, 0))
            Line((-0.06, 0), (0, 0.06))
            ThreePointArc((0, 0.06), (1, 0.06), (1.98, 0.056568542))
            Line((1.98, 0.056568542), (2, 0))
        make_face()
    fillet_1_piece_10a = extrude(amount=36.081445853, mode=Mode.PRIVATE)
    fillet_1_piece_10a = split(fillet_1_piece_10a, bisect_by=Plane(origin=(19, 6.499823967, -9.91733875), z_dir=(1, 0, 0)), keep=Keep.TOP, mode=Mode.PRIVATE)
    with BuildSketch(Plane(origin=(19, 7, 18.040722926), x_dir=(1, 0, 0), z_dir=(0, 0, -1))) as fillet_1_piece_10b_section:
        with BuildLine():
            CenterArc((2.828427125, 3), FILLET_1_R, 199.471220634, 70.528779366)
            Line((0, 2), (-0.056568542, 1.98))
            ThreePointArc((-0.056568542, 1.98), (-0.06, 1), (-0.06, 0))
            Line((-0.06, 0), (0, -0.06))
            Line((0, -0.06), (2.828427125, -0.06))
            Line((2.828427125, -0.06), (2.828427125, 0))
        make_face()
    fillet_1_piece_10b = extrude(amount=36.081445853, mode=Mode.PRIVATE)
    fillet_1_piece_10b = split(fillet_1_piece_10b, bisect_by=Plane(origin=(18.081798409, 6.49298497, -11.49977905), z_dir=(0.49999999999999983, 0, -0.8660254037844388)), keep=Keep.TOP, mode=Mode.PRIVATE)
    fillet_1_piece_10b = fillet_1_piece_10b - Plane(origin=(22.388176755, 6.49298497, -15.969331282), x_dir=(0, 0, -1), z_dir=(0, -1, 0)) * Cylinder(1.5, 84, mode=Mode.PRIVATE)
    fillet_1_piece_10 = fillet_1_piece_10a & fillet_1_piece_10b
    add(fillet_1_piece_10)
    with BuildSketch(Plane(origin=(6.123724357, 7, -25.474844135), x_dir=(0, -1, 0), z_dir=(-0.8660254037844386, 0, 0.5000000000000001))) as fillet_1_piece_11a_section:
        with BuildLine():
            CenterArc((3, -2.828427125), FILLET_1_R, 109.471220634, 70.528779366)
            Line((0, -2.828427125), (-0.06, -2.828427125))
            Line((-0.06, -2.828427125), (-0.06, 0))
            Line((-0.06, 0), (0, 0.06))
            ThreePointArc((0, 0.06), (1, 0.06), (1.98, 0.056568542))
            Line((1.98, 0.056568542), (2, 0))
        make_face()
    fillet_1_piece_11a = extrude(amount=36.081445853, mode=Mode.PRIVATE)
    fillet_1_piece_11a = split(fillet_1_piece_11a, bisect_by=Plane(origin=(0.911332705, 6.499823967, -21.413152047), z_dir=(0.49999999999999983, 0, -0.8660254037844388)), keep=Keep.TOP, mode=Mode.PRIVATE)
    with BuildSketch(Plane(origin=(25.123724357, 7, -7.434121209), x_dir=(0, -1, 0), z_dir=(-0.8660254037844388, 0, -0.49999999999999983))) as fillet_1_piece_11b_section:
        with BuildLine():
            CenterArc((3, -2.828427125), FILLET_1_R, 109.471220634, 70.528779366)
            Line((0, -2.828427125), (-0.06, -2.828427125))
            Line((-0.06, -2.828427125), (-0.06, 0))
            Line((-0.06, 0), (0, 0.06))
            ThreePointArc((0, 0.06), (1, 0.06), (1.98, 0.056568542))
            Line((1.98, 0.056568542), (2, 0))
        make_face()
    fillet_1_piece_11b = extrude(amount=36.081445853, mode=Mode.PRIVATE)
    fillet_1_piece_11b = split(fillet_1_piece_11b, bisect_by=Plane(origin=(-0.911332705, 6.499823967, -21.413152047), z_dir=(-0.5000000000000001, 0, -0.8660254037844386)), keep=Keep.TOP, mode=Mode.PRIVATE)
    fillet_1_piece_11 = fillet_1_piece_11a & fillet_1_piece_11b
    add(fillet_1_piece_11)
    with BuildSketch(Plane(origin=(-19, 7, -18.040722926), x_dir=(0, -1, 0), z_dir=(0, 0, 1))) as fillet_1_piece_12a_section:
        with BuildLine():
            CenterArc((3, -2.828427125), FILLET_1_R, 109.471220634, 70.528779366)
            Line((0, -2.828427125), (-0.06, -2.828427125))
            Line((-0.06, -2.828427125), (-0.06, 0))
            Line((-0.06, 0), (0, 0.06))
            ThreePointArc((0, 0.06), (1, 0.06), (1.98, 0.056568542))
            Line((1.98, 0.056568542), (2, 0))
        make_face()
    fillet_1_piece_12a = extrude(amount=36.081445853, mode=Mode.PRIVATE)
    fillet_1_piece_12a = split(fillet_1_piece_12a, bisect_by=Plane(origin=(-18.081798502, 6.492985076, -11.499778997), z_dir=(-0.5000000000000001, 0, -0.8660254037844386)), keep=Keep.TOP, mode=Mode.PRIVATE)
    fillet_1_piece_12a = fillet_1_piece_12a - Plane(origin=(-22.388176755, 6.492985076, -15.969331282), x_dir=(0, 0, 1), z_dir=(0, -1, 0)) * Cylinder(1.5, 84, mode=Mode.PRIVATE)
    with BuildSketch(Plane(origin=(6.123724357, 7, -25.474844135), x_dir=(0, -1, 0), z_dir=(-0.8660254037844386, 0, 0.5000000000000001))) as fillet_1_piece_12b_section:
        with BuildLine():
            CenterArc((3, -2.828427125), FILLET_1_R, 109.471220634, 70.528779366)
            Line((0, -2.828427125), (-0.06, -2.828427125))
            Line((-0.06, -2.828427125), (-0.06, 0))
            Line((-0.06, 0), (0, 0.06))
            ThreePointArc((0, 0.06), (1, 0.06), (1.98, 0.056568542))
            Line((1.98, 0.056568542), (2, 0))
        make_face()
    fillet_1_piece_12b = extrude(amount=36.081445853, mode=Mode.PRIVATE)
    fillet_1_piece_12b = split(fillet_1_piece_12b, bisect_by=Plane(origin=(-19, 6.499823967, -9.91733875), z_dir=(-1, 0, 0)), keep=Keep.TOP, mode=Mode.PRIVATE)
    fillet_1_piece_12 = fillet_1_piece_12a & fillet_1_piece_12b
    add(fillet_1_piece_12)

    # 倒角1
    chamfer_1_edges = [part.edges().sort_by_distance(p)[0] for p in [
        (15.969331282, 7, -20.888176755),
        (22.388176755, 7, -14.469331282),
        (22.388176755, 7, 14.469331282),
        (15.969331282, 7, 20.888176755),
        (-15.969331282, 7, 23.888176755),
        (-22.388176755, 7, 17.469331282),
        (-15.969331282, 7, -23.888176755),
        (-22.388176755, 7, -17.469331282),
    ]]
    chamfer(chamfer_1_edges, length=CHAMFER_1_SIZE)


solid = part.part
